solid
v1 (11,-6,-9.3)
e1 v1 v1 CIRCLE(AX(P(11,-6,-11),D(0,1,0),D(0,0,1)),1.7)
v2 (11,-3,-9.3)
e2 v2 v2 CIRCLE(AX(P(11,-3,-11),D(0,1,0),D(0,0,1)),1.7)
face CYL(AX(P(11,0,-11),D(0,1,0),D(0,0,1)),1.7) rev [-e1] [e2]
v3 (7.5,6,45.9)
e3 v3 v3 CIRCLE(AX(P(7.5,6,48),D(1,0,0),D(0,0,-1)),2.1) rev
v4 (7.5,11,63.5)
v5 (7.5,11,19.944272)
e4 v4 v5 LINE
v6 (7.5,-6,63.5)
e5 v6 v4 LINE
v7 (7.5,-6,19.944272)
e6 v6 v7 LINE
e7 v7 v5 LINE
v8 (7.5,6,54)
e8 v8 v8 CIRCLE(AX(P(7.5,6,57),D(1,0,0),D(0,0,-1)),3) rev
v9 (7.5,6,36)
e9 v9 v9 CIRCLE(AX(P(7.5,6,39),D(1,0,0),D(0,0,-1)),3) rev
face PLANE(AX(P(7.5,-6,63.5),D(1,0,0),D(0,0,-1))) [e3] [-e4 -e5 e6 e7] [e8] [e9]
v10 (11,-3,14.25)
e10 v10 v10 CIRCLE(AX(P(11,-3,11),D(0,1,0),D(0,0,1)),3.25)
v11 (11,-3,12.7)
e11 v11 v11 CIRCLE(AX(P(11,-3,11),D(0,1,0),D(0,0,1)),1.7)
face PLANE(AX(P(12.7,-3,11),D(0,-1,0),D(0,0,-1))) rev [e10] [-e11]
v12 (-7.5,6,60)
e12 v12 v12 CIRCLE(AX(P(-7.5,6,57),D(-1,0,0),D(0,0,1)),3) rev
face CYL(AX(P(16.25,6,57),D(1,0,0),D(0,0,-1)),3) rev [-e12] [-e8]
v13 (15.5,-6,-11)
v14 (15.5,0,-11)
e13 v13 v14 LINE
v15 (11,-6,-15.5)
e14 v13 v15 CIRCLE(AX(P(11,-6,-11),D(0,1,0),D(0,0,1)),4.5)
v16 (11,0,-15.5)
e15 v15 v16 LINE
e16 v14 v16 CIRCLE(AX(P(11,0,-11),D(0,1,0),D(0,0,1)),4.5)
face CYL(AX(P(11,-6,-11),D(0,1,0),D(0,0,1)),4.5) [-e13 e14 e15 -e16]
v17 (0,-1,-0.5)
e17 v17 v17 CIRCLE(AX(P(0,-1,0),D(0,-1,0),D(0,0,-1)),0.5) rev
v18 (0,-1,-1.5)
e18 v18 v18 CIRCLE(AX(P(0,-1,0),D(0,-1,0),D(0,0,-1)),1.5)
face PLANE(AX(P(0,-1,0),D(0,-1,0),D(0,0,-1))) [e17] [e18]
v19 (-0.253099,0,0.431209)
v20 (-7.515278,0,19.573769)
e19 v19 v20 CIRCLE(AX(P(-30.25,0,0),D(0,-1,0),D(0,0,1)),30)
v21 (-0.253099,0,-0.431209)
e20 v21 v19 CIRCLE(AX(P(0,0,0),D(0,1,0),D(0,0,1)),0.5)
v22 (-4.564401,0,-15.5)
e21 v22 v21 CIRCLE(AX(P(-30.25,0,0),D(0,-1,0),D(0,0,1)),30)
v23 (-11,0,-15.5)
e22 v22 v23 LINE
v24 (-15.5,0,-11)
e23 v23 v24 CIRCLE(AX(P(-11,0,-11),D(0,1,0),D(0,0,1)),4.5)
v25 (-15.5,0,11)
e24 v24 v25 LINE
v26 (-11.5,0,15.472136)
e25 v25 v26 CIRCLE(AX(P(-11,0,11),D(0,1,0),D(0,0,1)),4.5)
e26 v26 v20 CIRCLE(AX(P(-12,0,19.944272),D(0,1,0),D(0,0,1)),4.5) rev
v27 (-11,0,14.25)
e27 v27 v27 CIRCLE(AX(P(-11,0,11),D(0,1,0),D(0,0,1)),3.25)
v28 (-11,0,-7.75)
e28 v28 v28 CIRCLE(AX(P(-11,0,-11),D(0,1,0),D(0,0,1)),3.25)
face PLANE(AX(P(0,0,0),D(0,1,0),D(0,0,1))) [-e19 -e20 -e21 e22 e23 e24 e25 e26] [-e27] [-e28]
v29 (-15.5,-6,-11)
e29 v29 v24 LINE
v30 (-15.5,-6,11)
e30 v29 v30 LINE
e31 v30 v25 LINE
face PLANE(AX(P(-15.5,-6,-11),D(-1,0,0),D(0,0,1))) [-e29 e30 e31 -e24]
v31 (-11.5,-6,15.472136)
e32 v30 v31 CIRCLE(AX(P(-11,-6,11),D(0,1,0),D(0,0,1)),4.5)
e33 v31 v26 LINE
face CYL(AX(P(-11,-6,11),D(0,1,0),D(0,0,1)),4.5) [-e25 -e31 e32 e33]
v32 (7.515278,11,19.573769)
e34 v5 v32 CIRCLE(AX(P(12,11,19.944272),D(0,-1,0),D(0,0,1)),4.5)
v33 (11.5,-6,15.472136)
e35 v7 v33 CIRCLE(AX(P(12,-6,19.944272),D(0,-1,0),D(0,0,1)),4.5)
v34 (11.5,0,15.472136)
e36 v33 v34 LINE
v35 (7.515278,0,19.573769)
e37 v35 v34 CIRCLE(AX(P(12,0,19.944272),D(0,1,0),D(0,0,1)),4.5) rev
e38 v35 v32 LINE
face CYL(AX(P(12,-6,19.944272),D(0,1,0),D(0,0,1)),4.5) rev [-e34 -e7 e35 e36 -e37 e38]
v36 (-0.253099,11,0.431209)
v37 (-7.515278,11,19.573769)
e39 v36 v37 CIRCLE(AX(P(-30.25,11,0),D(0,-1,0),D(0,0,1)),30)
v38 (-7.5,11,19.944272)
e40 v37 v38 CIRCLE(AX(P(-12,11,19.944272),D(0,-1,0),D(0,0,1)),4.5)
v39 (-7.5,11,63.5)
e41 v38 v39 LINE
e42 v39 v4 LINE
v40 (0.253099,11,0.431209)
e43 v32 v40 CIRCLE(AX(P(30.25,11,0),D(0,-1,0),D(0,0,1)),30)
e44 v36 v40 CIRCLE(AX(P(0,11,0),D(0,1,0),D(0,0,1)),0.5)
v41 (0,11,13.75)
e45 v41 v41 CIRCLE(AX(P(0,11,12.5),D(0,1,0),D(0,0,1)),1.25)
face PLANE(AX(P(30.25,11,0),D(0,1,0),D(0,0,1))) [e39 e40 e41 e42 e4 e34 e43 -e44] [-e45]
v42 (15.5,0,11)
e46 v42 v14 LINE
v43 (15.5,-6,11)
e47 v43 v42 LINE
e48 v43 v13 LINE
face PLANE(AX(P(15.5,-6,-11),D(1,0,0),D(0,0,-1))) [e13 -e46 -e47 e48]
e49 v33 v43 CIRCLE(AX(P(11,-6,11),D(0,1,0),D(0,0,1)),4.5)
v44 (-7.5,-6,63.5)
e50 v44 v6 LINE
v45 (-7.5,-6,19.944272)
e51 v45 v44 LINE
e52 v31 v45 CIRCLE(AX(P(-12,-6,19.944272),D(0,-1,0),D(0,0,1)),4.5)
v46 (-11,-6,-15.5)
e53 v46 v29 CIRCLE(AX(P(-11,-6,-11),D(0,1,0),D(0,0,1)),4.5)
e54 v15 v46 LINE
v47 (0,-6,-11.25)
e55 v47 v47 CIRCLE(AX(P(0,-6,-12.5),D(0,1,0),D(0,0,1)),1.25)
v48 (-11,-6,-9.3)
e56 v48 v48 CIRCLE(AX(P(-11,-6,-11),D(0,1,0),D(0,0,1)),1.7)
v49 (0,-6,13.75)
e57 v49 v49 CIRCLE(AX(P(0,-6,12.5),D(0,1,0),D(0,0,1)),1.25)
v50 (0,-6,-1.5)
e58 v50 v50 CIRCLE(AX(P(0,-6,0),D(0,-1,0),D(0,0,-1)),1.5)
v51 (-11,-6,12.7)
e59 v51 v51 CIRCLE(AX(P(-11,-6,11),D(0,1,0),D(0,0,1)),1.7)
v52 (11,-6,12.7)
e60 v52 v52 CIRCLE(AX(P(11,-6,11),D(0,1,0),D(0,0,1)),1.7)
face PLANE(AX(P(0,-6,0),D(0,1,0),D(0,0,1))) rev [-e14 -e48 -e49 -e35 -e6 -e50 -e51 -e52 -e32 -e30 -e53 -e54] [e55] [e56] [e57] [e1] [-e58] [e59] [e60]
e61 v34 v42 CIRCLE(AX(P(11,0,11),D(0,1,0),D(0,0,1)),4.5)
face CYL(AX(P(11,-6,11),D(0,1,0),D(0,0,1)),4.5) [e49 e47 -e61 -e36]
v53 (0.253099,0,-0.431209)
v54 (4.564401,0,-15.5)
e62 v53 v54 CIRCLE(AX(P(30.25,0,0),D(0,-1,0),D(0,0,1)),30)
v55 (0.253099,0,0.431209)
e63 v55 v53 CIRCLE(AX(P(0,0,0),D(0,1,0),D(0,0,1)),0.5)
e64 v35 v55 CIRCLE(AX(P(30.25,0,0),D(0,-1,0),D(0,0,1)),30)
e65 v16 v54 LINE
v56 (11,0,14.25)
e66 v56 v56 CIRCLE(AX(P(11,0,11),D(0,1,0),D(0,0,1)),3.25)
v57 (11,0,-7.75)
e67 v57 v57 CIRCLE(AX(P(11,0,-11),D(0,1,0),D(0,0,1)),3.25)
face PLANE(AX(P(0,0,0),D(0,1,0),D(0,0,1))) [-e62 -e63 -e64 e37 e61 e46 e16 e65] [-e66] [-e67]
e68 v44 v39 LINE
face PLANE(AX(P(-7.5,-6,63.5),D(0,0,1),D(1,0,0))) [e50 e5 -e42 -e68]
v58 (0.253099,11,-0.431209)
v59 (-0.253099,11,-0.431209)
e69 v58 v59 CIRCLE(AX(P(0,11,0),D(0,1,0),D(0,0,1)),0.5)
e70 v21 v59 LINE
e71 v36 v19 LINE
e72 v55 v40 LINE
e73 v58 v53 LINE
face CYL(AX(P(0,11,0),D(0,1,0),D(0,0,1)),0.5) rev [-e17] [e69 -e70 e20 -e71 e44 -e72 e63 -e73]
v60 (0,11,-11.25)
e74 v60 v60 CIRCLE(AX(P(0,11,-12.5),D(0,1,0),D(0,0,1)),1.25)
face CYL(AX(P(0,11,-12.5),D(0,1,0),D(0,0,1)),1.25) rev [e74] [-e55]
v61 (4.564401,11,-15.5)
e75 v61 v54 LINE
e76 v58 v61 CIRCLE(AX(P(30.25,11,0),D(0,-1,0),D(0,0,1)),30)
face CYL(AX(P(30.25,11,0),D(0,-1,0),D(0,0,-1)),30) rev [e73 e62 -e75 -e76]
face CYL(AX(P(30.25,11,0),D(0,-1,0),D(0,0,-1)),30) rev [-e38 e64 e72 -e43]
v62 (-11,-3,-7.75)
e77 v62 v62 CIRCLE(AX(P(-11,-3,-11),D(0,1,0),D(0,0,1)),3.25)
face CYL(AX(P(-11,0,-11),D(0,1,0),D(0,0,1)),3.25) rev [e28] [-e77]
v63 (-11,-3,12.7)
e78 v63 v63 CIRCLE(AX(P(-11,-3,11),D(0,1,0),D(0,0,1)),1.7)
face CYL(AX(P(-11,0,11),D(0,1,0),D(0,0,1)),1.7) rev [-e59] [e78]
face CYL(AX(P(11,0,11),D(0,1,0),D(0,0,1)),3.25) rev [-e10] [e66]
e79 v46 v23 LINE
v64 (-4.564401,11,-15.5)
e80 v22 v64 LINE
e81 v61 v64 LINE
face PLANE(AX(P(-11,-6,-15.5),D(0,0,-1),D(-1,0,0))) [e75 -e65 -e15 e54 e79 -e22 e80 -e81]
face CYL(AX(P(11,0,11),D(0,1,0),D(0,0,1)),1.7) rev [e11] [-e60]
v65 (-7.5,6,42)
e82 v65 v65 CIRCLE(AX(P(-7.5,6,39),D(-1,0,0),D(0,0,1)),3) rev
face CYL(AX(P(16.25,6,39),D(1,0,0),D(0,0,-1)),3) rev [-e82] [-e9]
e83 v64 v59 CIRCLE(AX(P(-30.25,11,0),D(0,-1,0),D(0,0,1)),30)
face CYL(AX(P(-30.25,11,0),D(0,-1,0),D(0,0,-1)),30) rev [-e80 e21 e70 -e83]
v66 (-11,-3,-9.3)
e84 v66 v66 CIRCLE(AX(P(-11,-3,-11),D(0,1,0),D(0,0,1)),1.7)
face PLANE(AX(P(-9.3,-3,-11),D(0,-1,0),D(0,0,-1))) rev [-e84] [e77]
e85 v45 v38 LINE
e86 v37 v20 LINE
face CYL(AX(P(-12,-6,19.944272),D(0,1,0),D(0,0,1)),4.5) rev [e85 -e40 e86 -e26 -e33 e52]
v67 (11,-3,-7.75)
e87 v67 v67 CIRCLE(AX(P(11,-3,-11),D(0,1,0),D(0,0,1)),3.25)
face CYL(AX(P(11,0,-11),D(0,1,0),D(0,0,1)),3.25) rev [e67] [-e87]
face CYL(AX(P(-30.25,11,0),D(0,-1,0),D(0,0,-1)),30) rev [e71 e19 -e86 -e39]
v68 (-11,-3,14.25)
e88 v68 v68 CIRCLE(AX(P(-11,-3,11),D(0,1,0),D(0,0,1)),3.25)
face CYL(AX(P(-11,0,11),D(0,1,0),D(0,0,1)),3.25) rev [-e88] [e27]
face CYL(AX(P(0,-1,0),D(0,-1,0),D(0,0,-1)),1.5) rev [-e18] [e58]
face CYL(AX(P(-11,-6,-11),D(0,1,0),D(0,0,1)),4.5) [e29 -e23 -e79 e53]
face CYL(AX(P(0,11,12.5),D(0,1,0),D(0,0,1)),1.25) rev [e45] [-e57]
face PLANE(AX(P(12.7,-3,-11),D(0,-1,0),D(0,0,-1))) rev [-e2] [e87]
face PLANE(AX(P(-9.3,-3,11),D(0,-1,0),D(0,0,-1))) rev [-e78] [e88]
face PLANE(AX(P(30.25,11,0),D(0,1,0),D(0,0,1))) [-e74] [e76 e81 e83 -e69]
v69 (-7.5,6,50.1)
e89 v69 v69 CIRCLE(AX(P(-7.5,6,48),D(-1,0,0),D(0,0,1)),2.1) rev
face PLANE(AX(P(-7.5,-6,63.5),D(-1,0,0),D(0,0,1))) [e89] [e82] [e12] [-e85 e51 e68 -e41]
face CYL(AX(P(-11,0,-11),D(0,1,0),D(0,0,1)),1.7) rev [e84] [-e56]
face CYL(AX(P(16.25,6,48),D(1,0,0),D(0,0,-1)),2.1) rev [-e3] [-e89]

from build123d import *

# Parameters (mm, degrees)
SKETCH1_W                      = 32.5
SKETCH1_H                      = 80.25
BOSS_EXTRUDE1_DEPTH            = 6
BOSS_EXTRUDE2_DEPTH            = 11
F_6_0MM_DOWEL_HOLE1_D          = 6
M5X0_8_TAPPED_HOLE1_D          = 4.2
CBORE_FOR_M3_SHCS1_D           = 3.4
CBORE_FOR_M3_SHCS1_CBORE_D     = 6.5
CBORE_FOR_M3_SHCS1_CBORE_DEPTH = 3
F_1_0_1_DIAMETER_HOLE1_D       = 1
SKETCH12_R                     = 1.5
CUT_EXTRUDE1_DEPTH             = 5
SKETCH13_W                     = 6
SKETCH13_H                     = 35
CUT_EXTRUDE2_DEPTH             = 69.184034055
FILLET1_R                      = 2.38125
SKETCH14_W                     = 34.5
SKETCH14_H                     = 82.25
CUT_EXTRUDE3_DEPTH             = 69.184034055
M3X0_5_START                   = -6
M3X0_5_TAPPED_HOLE1_OUTLINE_R  = 1.25
M3X0_5_TAPPED_HOLE1_DEPTH      = 17


# Read off the part's stored shape, not the designer's step: M3x0.5 Tapped Hole1
with BuildPart() as part:
    # Sketch1 → Boss-Extrude1 (new body)
    with BuildSketch(Plane(origin=(0, 0, 0), x_dir=(1, 0, 0), z_dir=(0, 1, 0))):
        with Locations((0, -23.875)):
            Rectangle(SKETCH1_W, SKETCH1_H)
    extrude(amount=-BOSS_EXTRUDE1_DEPTH)

    # Sketch2 → Boss-Extrude2 (add)
    with BuildSketch(Plane(origin=(0, 0, 0), x_dir=(1, 0, 0), z_dir=(0, 1, 0))):
        with BuildLine():
            Line((-5.032198748, 16.25), (5.032198748, 16.25))
            ThreePointArc((5.032198748, 16.25), (1.230950737, -7.608861929), (16.25, -26.532998323))
            Line((16.25, -26.532998323), (16.25, -64))
            Line((16.25, -64), (-16.25, -64))
            Line((-16.25, -64), (-16.25, -26.532998323))
            ThreePointArc((-16.25, -26.532998323), (-1.230950737, -7.608861929), (-5.032198748, 16.25))
        make_face()
    extrude(amount=BOSS_EXTRUDE2_DEPTH)

    # Ø6.0mm Dowel Hole1 (through all)
    with Locations(Plane(origin=(16.25, 0, 0), x_dir=(0, 0, -1), z_dir=(1, 0, 0))):
        with Locations((-57, 6), (-39, 6)):
            Hole(F_6_0MM_DOWEL_HOLE1_D / 2)

    # M5x0.8 Tapped Hole1 (through all)
    with Locations(Plane(origin=(16.25, 0, 0), x_dir=(0, 0, -1), z_dir=(1, 0, 0))):
        with Locations((-48, 6)):
            Hole(M5X0_8_TAPPED_HOLE1_D / 2)

    # CBORE for M3 SHCS1 (through all)
    with Locations(Plane(origin=(0, 0, 0), x_dir=(1, 0, 0), z_dir=(0, 1, 0))):
        with Locations((-11, 11), (11, 11), (11, -11), (-11, -11)):
            CounterBoreHole(CBORE_FOR_M3_SHCS1_D / 2, CBORE_FOR_M3_SHCS1_CBORE_D / 2, CBORE_FOR_M3_SHCS1_CBORE_DEPTH)

    # Ø1.0 (1) Diameter Hole1 (through all)
    with Locations(Plane(origin=(0, 11, 0), x_dir=(1, 0, 0), z_dir=(0, 1, 0))):
        with Locations((0, 0)):
            Hole(F_1_0_1_DIAMETER_HOLE1_D / 2)

    # Sketch12 → Cut-Extrude1 (cut)
    with BuildSketch(Plane.XZ.offset(6)):
        with Locations(Location((0, 0, 0), (0, 0, 270))):
            Circle(SKETCH12_R)
    extrude(amount=-CUT_EXTRUDE1_DEPTH, mode=Mode.SUBTRACT)

    # Sketch13 → Cut-Extrude2 (cut, through all)
    with BuildSketch(Plane(origin=(0, 11, 0), x_dir=(1, 0, 0), z_dir=(0, 1, 0))):
        with Locations((-13.25, -46.5)):
            Rectangle(SKETCH13_W, SKETCH13_H)
        with Locations((13.25, -46.5)):
            Rectangle(SKETCH13_W, SKETCH13_H)
    extrude(amount=-CUT_EXTRUDE2_DEPTH, mode=Mode.SUBTRACT)

    # Fillet1
    fillet1_edges = [part.edges().sort_by_distance(p)[0] for p in [
        (-10.25, 2.5, 29),
        (10.25, 2.5, 29),
    ]]
    fillet(fillet1_edges, radius=FILLET1_R)

    # Sketch14 → Cut-Extrude3 (cut, through all)
    with BuildSketch(Plane(origin=(0, 11, 0), x_dir=(1, 0, 0), z_dir=(0, 1, 0))):
        with Locations((0, -23.875)):
            Rectangle(SKETCH14_W, SKETCH14_H)
        with BuildLine():
            Line((-7.5, -63.5), (-7.5, -19.94427191))
            ThreePointArc((-7.5, -19.94427191), (-8.645898034, -16.94427191), (-11.5, -15.472135955))
            ThreePointArc((-11.5, -15.472135955), (-14.354101966, -14), (-15.5, -11))
            Line((-15.5, -11), (-15.5, 11))
            ThreePointArc((-15.5, 11), (-14.181980515, 14.181980515), (-11, 15.5))
            Line((-11, 15.5), (11, 15.5))
            ThreePointArc((11, 15.5), (14.181980515, 14.181980515), (15.5, 11))
            Line((15.5, 11), (15.5, -11))
            ThreePointArc((15.5, -11), (14.354101966, -14), (11.5, -15.472135955))
            ThreePointArc((11.5, -15.472135955), (8.645898034, -16.94427191), (7.5, -19.94427191))
            Line((7.5, -19.94427191), (7.5, -63.5))
            Line((7.5, -63.5), (-7.5, -63.5))
        make_face(mode=Mode.SUBTRACT)
    extrude(amount=-CUT_EXTRUDE3_DEPTH, mode=Mode.SUBTRACT)

    # M3x0.5 Tapped Hole1 outline → M3x0.5 Tapped Hole1 (cut)
    with BuildSketch(Plane(origin=(0, 0, 0), x_dir=(1, 0, 0), z_dir=(0, 1, 0)).offset(M3X0_5_START)):
        with Locations((0, -12.5)):
            Circle(M3X0_5_TAPPED_HOLE1_OUTLINE_R)
        with Locations((0, 12.5)):
            Circle(M3X0_5_TAPPED_HOLE1_OUTLINE_R)
    extrude(amount=M3X0_5_TAPPED_HOLE1_DEPTH, mode=Mode.SUBTRACT)


solid = part.part
